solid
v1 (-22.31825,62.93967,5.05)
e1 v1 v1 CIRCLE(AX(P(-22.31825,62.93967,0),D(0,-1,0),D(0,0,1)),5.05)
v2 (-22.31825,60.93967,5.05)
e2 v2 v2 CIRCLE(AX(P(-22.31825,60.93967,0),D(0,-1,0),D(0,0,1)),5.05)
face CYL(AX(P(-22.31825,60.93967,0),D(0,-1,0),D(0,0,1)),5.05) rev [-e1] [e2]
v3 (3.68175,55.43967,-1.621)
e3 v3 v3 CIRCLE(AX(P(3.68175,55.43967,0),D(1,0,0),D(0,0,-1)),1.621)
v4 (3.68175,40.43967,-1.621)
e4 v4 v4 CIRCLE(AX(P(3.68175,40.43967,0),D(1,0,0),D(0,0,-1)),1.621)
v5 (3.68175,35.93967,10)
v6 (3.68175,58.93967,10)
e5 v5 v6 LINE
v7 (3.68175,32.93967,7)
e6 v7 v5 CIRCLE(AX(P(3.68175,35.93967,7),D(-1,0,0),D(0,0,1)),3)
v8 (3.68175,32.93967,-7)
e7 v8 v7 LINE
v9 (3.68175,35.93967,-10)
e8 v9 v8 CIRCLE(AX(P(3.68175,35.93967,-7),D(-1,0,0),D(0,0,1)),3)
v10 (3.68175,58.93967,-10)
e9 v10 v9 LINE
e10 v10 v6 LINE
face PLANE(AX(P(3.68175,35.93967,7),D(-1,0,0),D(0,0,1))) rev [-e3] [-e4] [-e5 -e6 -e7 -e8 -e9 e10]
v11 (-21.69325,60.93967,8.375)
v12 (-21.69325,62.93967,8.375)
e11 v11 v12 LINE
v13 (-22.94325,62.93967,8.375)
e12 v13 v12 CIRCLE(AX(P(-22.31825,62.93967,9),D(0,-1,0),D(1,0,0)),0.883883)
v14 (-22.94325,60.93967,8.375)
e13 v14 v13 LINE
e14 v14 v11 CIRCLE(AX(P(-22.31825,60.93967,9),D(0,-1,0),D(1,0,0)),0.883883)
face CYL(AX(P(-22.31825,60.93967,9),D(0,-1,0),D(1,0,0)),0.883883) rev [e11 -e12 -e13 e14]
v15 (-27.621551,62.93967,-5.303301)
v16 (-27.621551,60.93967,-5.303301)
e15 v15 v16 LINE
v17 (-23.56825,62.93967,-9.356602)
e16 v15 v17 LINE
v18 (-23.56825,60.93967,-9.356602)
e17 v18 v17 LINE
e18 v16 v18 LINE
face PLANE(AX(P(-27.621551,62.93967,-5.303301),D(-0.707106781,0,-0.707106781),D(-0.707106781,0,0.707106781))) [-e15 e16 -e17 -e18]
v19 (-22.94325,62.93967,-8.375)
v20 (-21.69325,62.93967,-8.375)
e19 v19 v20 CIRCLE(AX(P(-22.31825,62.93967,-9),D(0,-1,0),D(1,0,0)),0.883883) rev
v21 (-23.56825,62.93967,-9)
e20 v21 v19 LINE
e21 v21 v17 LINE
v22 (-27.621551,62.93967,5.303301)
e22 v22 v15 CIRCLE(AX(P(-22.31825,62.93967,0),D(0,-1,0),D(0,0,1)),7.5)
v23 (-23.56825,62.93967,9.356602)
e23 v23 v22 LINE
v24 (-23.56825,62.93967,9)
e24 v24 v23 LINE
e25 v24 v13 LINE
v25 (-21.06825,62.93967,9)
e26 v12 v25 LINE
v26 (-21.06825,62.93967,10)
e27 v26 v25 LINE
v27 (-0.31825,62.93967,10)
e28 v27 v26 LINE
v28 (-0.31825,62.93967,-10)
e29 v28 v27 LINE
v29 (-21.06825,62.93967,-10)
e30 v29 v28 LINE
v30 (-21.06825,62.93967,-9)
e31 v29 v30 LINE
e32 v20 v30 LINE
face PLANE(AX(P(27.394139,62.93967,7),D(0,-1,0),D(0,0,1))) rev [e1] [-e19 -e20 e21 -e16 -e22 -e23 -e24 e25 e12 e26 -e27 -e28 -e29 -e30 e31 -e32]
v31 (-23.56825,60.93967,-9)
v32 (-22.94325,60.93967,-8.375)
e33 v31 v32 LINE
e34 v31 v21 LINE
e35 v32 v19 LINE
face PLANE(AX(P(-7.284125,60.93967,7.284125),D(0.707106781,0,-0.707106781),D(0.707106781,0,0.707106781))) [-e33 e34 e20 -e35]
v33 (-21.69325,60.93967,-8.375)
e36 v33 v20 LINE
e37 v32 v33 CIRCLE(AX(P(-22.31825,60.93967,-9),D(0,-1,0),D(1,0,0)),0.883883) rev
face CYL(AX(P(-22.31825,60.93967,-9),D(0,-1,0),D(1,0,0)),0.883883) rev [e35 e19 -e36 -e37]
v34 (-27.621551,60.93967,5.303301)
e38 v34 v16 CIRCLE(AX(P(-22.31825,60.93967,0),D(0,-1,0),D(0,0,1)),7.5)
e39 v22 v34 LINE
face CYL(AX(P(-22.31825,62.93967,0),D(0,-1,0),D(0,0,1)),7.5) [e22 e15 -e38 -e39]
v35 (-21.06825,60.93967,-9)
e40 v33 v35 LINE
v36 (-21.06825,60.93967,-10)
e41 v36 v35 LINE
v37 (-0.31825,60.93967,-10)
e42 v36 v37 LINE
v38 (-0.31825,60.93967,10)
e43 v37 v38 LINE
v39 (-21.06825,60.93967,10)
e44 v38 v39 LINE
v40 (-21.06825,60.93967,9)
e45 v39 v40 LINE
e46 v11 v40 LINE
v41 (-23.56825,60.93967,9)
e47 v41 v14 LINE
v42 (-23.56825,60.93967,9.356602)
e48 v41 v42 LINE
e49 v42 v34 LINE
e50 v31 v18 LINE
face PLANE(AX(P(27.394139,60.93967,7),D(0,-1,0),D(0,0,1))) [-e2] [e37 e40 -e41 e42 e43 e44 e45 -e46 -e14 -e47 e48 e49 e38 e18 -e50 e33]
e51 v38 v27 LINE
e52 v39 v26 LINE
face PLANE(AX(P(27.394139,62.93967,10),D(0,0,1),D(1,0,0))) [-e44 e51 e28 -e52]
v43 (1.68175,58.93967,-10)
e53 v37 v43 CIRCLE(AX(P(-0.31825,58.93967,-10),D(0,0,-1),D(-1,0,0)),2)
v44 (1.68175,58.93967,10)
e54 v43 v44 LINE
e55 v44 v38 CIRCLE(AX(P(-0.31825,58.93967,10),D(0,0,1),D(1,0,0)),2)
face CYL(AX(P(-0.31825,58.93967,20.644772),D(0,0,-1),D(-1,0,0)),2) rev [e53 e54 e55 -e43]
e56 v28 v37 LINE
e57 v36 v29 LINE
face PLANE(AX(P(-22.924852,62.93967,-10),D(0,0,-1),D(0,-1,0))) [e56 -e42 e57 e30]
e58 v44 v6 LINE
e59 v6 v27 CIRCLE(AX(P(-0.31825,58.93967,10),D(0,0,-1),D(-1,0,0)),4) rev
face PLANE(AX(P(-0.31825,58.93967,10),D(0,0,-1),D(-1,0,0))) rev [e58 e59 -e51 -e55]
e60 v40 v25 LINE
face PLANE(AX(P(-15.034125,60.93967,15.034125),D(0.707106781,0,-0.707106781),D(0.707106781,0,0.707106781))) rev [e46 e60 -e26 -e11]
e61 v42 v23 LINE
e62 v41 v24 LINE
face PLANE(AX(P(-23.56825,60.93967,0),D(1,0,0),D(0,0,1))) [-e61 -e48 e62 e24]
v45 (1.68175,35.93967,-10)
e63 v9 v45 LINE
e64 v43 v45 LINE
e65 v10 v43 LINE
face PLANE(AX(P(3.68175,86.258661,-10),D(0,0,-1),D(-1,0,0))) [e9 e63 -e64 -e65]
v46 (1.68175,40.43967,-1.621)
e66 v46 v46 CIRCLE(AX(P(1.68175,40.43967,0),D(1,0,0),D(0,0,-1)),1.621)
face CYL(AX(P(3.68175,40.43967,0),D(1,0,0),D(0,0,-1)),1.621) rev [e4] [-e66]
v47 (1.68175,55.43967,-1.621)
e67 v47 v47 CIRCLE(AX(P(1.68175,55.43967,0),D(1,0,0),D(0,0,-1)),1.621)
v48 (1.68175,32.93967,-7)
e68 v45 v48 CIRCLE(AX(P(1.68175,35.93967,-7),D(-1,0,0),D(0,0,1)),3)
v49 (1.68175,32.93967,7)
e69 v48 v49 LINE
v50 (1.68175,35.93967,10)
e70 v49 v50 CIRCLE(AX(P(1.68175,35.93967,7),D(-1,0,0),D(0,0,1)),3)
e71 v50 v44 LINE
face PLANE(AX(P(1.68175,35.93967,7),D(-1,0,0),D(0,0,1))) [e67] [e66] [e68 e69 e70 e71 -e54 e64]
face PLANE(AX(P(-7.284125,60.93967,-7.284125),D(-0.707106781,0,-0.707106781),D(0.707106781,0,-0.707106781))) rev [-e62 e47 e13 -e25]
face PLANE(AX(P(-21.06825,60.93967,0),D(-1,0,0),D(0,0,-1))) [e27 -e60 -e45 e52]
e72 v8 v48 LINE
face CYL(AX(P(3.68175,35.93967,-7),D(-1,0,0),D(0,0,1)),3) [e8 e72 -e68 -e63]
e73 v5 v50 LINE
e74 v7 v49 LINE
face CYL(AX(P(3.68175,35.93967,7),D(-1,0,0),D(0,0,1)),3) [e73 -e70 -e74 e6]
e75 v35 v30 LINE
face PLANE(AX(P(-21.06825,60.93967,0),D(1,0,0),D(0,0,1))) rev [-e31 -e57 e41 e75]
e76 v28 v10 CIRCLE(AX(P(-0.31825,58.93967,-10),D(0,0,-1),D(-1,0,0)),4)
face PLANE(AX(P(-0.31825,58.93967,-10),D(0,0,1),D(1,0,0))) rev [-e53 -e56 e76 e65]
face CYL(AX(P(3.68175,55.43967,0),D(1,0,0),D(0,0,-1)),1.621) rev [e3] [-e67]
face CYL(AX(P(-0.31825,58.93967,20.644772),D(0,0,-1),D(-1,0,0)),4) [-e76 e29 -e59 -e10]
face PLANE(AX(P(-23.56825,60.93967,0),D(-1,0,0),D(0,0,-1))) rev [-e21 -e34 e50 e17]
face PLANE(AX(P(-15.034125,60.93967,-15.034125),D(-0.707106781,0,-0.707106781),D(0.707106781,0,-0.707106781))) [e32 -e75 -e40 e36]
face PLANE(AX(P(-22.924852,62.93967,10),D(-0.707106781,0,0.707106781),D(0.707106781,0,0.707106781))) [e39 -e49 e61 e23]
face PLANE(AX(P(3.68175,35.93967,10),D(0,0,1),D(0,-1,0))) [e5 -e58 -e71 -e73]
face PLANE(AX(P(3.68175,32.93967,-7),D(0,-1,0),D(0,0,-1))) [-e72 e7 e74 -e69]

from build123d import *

# Parameters (mm, degrees)
BOSS_EXTRUDE1_DEPTH        = 2
M3_CLEARANCE_HOLE1_D       = 3.242
HOLE1_D                    = 10.1
SKETCHED_START             = 62.517190459
SKETCHED_BEND1_OUTLINE_W   = 2
SKETCHED_BEND1_OUTLINE_H   = 20.000000002
SKETCHED_BEND1_DEPTH       = 31.482809541
SKETCHED_START_2           = 60.939670459
SKETCHED_BEND1_2_OUTLINE_R = 5.05
SKETCHED_BEND1_2_DEPTH     = 0.021621314
SKETCHED_START_3           = 58.939670459
SKETCHED_BEND1_3_OUTLINE_R = 5.05
SKETCHED_BEND1_3_DEPTH     = 4
SKETCHED_START_4           = -10.000000001
SKETCHED_BEND1_4_DEPTH     = 20.000000002
CUT_EXTRUDE1_REACH         = 45.464


with BuildPart() as part:
    # Sketch5 → Boss-Extrude1 (new body)
    with BuildSketch(Plane(origin=(1.681750162, 0, 0), x_dir=(0, -1, 0), z_dir=(-1, 0, 0))):
        with BuildLine():
            Line((-35.93967046, 10.000000001), (-86.258661155, 10.000000001))
            Line((-86.258661155, 10.000000001), (-90.955360298, 5.303300858))
            ThreePointArc((-90.955360298, 5.303300858), (-93.152059438, 0), (-90.955360298, -5.303300858))
            Line((-90.955360298, -5.303300858), (-86.258661155, -10.000000001))
            Line((-86.258661155, -10.000000001), (-35.93967046, -10.000000001))
            ThreePointArc((-35.93967046, -10.000000001), (-33.818350116, -9.121320344), (-32.93967046, -7.000000001))
            Line((-32.93967046, -7.000000001), (-32.93967046, 7.000000001))
            ThreePointArc((-32.93967046, 7.000000001), (-33.818350116, 9.121320344), (-35.93967046, 10.000000001))
        make_face()
    extrude(amount=-BOSS_EXTRUDE1_DEPTH)

    # M3 Clearance Hole1 (through all)
    with Locations(Plane(origin=(3.681750162, 0, 0), x_dir=(0, 0, -1), z_dir=(1, 0, 0))):
        with Locations((0, 40.439670459), (0, 55.439670459)):
            Hole(M3_CLEARANCE_HOLE1_D / 2)

    # Hole1 (through all)
    with Locations(Plane.ZY.offset(-1.681750162)):
        with Locations((0, 85.65205944)):
            Hole(HOLE1_D / 2)

    # Sketched Bend1: read off the stored shape, not the designer's step
    # Sketched Bend1 outline → Sketched Bend1 (cut)
    with BuildSketch(Plane(origin=(0, 0, 0), x_dir=(1, 0, 0), z_dir=(0, 1, 0)).offset(SKETCHED_START)):
        with Locations((2.681750162, 0)):
            Rectangle(SKETCHED_BEND1_OUTLINE_W, SKETCHED_BEND1_OUTLINE_H)
    extrude(amount=SKETCHED_BEND1_DEPTH, mode=Mode.SUBTRACT)

    # Sketched Bend1 2 outline → Sketched Bend1 2 (add)
    with BuildSketch(Plane(origin=(0, 0, 0), x_dir=(1, 0, 0), z_dir=(0, 1, 0)).offset(SKETCHED_START_2)):
        with BuildLine():
            Line((1.681750162, 10.000000001), (-22.924851553, 10.000000001))
            Line((-22.924851553, 10.000000001), (-27.621550696, 5.303300858))
            ThreePointArc((-27.621550696, 5.303300858), (-29.818249837, 0), (-27.621550696, -5.303300858))
            Line((-27.621550696, -5.303300858), (-22.924851553, -10.000000001))
            Line((-22.924851553, -10.000000001), (1.681750162, -10.000000001))
            Line((1.681750162, -10.000000001), (1.681750162, 10.000000001))
        make_face()
        with Locations((-22.318249838, 0)):
            Circle(SKETCHED_BEND1_2_OUTLINE_R, mode=Mode.SUBTRACT)
    extrude(amount=SKETCHED_BEND1_2_DEPTH)

    # Sketched Bend1 3 outline → Sketched Bend1 3 (add)
    with BuildSketch(Plane(origin=(0, 0, 0), x_dir=(1, 0, 0), z_dir=(0, 1, 0)).offset(SKETCHED_START_3)):
        with BuildLine():
            Line((1.681750162, 10.000000001), (-22.924851553, 10.000000001))
            Line((-22.924851553, 10.000000001), (-27.621550696, 5.303300858))
            ThreePointArc((-27.621550696, 5.303300858), (-29.818249837, 0), (-27.621550696, -5.303300858))
            Line((-27.621550696, -5.303300858), (-22.924851553, -10.000000001))
            Line((-22.924851553, -10.000000001), (1.681750162, -10.000000001))
            Line((1.681750162, -10.000000001), (1.681750162, 10.000000001))
        make_face()
        with Locations((-22.318249838, 0)):
            Circle(SKETCHED_BEND1_3_OUTLINE_R, mode=Mode.SUBTRACT)
    extrude(amount=SKETCHED_BEND1_3_DEPTH)

    # Sketched Bend1 4 outline → Sketched Bend1 4 (cut)
    with BuildSketch(Plane.XY.offset(SKETCHED_START_4)):
        with BuildLine():
            Line((-0.318249838, 60.939670459), (-31, 60.939670459))
            Line((-31, 60.939670459), (-31, 58.939670459))
            Line((-31, 58.939670459), (1.681750162, 58.939670459))
            ThreePointArc((1.681750162, 58.939670459), (1.095963724, 60.353884021), (-0.318249838, 60.939670459))
        make_face()
        with BuildLine():
            Line((-31, 64), (-31, 62.939670452))
            Line((-31, 62.939670452), (-0.318249838, 62.939670459))
            ThreePointArc((-0.318249838, 62.939670459), (2.510177287, 61.768097584), (3.681750162, 58.939670459))
            Line((3.681750162, 58.939670459), (3.681750162, 62.517190459))
            Line((3.681750162, 62.517190459), (1.681750162, 62.517190459))
            Line((1.681750162, 62.517190459), (1.681750162, 64))
            Line((1.681750162, 64), (-31, 64))
        make_face()
    extrude(amount=SKETCHED_BEND1_4_DEPTH, mode=Mode.SUBTRACT)

    # Sketch15 → Cut-Extrude1 (cut, up to next)
    with BuildSketch(Plane(origin=(0, 62.939670459, 0), x_dir=(1, 0, 0), z_dir=(0, 1, 0)), mode=Mode.PRIVATE) as cut_extrude1_sk1:
        with BuildLine():
            Line((-21.068249838, 9.000000001), (-21.068249838, 10.000000001))
            Line((-21.068249838, 10.000000001), (-22.924851553, 10.000000001))
            Line((-22.924851553, 10.000000001), (-23.568249838, 9.356601716))
            Line((-23.568249838, 9.356601716), (-23.568249838, 9.000000001))
            Line((-23.568249838, 9.000000001), (-22.943249838, 8.375000001))
            ThreePointArc((-22.943249838, 8.375000001), (-22.318249838, 8.116116524), (-21.693249838, 8.375000001))
            Line((-21.693249838, 8.375000001), (-21.068249838, 9.000000001))
        make_face()
    cut_extrude1_tool1 = extrude(cut_extrude1_sk1.sketch, amount=-CUT_EXTRUDE1_REACH, mode=Mode.PRIVATE) & part.part
    # Sketch15 → Cut-Extrude1 (cut, up to next)
    with BuildSketch(Plane(origin=(0, 62.939670459, 0), x_dir=(1, 0, 0), z_dir=(0, 1, 0)), mode=Mode.PRIVATE) as cut_extrude1_sk2:
        with BuildLine():
            Line((-21.068249838, -9.000000001), (-21.693249838, -8.375000001))
            ThreePointArc((-21.693249838, -8.375000001), (-22.318249838, -8.116116524), (-22.943249838, -8.375000001))
            Line((-22.943249838, -8.375000001), (-23.568249838, -9.000000001))
            Line((-23.568249838, -9.000000001), (-23.568249838, -9.356601716))
            Line((-23.568249838, -9.356601716), (-22.924851553, -10.000000001))
            Line((-22.924851553, -10.000000001), (-21.068249838, -10.000000001))
            Line((-21.068249838, -10.000000001), (-21.068249838, -9.000000001))
        make_face()
    cut_extrude1_tool2 = extrude(cut_extrude1_sk2.sketch, amount=-CUT_EXTRUDE1_REACH, mode=Mode.PRIVATE) & part.part
    add(cut_extrude1_tool1.solids().sort_by_distance((-22.260131, 62.93967, -9.16246))[0], mode=Mode.SUBTRACT)
    add(cut_extrude1_tool2.solids().sort_by_distance((-22.260131, 62.93967, 9.16246))[0], mode=Mode.SUBTRACT)


solid = part.part
